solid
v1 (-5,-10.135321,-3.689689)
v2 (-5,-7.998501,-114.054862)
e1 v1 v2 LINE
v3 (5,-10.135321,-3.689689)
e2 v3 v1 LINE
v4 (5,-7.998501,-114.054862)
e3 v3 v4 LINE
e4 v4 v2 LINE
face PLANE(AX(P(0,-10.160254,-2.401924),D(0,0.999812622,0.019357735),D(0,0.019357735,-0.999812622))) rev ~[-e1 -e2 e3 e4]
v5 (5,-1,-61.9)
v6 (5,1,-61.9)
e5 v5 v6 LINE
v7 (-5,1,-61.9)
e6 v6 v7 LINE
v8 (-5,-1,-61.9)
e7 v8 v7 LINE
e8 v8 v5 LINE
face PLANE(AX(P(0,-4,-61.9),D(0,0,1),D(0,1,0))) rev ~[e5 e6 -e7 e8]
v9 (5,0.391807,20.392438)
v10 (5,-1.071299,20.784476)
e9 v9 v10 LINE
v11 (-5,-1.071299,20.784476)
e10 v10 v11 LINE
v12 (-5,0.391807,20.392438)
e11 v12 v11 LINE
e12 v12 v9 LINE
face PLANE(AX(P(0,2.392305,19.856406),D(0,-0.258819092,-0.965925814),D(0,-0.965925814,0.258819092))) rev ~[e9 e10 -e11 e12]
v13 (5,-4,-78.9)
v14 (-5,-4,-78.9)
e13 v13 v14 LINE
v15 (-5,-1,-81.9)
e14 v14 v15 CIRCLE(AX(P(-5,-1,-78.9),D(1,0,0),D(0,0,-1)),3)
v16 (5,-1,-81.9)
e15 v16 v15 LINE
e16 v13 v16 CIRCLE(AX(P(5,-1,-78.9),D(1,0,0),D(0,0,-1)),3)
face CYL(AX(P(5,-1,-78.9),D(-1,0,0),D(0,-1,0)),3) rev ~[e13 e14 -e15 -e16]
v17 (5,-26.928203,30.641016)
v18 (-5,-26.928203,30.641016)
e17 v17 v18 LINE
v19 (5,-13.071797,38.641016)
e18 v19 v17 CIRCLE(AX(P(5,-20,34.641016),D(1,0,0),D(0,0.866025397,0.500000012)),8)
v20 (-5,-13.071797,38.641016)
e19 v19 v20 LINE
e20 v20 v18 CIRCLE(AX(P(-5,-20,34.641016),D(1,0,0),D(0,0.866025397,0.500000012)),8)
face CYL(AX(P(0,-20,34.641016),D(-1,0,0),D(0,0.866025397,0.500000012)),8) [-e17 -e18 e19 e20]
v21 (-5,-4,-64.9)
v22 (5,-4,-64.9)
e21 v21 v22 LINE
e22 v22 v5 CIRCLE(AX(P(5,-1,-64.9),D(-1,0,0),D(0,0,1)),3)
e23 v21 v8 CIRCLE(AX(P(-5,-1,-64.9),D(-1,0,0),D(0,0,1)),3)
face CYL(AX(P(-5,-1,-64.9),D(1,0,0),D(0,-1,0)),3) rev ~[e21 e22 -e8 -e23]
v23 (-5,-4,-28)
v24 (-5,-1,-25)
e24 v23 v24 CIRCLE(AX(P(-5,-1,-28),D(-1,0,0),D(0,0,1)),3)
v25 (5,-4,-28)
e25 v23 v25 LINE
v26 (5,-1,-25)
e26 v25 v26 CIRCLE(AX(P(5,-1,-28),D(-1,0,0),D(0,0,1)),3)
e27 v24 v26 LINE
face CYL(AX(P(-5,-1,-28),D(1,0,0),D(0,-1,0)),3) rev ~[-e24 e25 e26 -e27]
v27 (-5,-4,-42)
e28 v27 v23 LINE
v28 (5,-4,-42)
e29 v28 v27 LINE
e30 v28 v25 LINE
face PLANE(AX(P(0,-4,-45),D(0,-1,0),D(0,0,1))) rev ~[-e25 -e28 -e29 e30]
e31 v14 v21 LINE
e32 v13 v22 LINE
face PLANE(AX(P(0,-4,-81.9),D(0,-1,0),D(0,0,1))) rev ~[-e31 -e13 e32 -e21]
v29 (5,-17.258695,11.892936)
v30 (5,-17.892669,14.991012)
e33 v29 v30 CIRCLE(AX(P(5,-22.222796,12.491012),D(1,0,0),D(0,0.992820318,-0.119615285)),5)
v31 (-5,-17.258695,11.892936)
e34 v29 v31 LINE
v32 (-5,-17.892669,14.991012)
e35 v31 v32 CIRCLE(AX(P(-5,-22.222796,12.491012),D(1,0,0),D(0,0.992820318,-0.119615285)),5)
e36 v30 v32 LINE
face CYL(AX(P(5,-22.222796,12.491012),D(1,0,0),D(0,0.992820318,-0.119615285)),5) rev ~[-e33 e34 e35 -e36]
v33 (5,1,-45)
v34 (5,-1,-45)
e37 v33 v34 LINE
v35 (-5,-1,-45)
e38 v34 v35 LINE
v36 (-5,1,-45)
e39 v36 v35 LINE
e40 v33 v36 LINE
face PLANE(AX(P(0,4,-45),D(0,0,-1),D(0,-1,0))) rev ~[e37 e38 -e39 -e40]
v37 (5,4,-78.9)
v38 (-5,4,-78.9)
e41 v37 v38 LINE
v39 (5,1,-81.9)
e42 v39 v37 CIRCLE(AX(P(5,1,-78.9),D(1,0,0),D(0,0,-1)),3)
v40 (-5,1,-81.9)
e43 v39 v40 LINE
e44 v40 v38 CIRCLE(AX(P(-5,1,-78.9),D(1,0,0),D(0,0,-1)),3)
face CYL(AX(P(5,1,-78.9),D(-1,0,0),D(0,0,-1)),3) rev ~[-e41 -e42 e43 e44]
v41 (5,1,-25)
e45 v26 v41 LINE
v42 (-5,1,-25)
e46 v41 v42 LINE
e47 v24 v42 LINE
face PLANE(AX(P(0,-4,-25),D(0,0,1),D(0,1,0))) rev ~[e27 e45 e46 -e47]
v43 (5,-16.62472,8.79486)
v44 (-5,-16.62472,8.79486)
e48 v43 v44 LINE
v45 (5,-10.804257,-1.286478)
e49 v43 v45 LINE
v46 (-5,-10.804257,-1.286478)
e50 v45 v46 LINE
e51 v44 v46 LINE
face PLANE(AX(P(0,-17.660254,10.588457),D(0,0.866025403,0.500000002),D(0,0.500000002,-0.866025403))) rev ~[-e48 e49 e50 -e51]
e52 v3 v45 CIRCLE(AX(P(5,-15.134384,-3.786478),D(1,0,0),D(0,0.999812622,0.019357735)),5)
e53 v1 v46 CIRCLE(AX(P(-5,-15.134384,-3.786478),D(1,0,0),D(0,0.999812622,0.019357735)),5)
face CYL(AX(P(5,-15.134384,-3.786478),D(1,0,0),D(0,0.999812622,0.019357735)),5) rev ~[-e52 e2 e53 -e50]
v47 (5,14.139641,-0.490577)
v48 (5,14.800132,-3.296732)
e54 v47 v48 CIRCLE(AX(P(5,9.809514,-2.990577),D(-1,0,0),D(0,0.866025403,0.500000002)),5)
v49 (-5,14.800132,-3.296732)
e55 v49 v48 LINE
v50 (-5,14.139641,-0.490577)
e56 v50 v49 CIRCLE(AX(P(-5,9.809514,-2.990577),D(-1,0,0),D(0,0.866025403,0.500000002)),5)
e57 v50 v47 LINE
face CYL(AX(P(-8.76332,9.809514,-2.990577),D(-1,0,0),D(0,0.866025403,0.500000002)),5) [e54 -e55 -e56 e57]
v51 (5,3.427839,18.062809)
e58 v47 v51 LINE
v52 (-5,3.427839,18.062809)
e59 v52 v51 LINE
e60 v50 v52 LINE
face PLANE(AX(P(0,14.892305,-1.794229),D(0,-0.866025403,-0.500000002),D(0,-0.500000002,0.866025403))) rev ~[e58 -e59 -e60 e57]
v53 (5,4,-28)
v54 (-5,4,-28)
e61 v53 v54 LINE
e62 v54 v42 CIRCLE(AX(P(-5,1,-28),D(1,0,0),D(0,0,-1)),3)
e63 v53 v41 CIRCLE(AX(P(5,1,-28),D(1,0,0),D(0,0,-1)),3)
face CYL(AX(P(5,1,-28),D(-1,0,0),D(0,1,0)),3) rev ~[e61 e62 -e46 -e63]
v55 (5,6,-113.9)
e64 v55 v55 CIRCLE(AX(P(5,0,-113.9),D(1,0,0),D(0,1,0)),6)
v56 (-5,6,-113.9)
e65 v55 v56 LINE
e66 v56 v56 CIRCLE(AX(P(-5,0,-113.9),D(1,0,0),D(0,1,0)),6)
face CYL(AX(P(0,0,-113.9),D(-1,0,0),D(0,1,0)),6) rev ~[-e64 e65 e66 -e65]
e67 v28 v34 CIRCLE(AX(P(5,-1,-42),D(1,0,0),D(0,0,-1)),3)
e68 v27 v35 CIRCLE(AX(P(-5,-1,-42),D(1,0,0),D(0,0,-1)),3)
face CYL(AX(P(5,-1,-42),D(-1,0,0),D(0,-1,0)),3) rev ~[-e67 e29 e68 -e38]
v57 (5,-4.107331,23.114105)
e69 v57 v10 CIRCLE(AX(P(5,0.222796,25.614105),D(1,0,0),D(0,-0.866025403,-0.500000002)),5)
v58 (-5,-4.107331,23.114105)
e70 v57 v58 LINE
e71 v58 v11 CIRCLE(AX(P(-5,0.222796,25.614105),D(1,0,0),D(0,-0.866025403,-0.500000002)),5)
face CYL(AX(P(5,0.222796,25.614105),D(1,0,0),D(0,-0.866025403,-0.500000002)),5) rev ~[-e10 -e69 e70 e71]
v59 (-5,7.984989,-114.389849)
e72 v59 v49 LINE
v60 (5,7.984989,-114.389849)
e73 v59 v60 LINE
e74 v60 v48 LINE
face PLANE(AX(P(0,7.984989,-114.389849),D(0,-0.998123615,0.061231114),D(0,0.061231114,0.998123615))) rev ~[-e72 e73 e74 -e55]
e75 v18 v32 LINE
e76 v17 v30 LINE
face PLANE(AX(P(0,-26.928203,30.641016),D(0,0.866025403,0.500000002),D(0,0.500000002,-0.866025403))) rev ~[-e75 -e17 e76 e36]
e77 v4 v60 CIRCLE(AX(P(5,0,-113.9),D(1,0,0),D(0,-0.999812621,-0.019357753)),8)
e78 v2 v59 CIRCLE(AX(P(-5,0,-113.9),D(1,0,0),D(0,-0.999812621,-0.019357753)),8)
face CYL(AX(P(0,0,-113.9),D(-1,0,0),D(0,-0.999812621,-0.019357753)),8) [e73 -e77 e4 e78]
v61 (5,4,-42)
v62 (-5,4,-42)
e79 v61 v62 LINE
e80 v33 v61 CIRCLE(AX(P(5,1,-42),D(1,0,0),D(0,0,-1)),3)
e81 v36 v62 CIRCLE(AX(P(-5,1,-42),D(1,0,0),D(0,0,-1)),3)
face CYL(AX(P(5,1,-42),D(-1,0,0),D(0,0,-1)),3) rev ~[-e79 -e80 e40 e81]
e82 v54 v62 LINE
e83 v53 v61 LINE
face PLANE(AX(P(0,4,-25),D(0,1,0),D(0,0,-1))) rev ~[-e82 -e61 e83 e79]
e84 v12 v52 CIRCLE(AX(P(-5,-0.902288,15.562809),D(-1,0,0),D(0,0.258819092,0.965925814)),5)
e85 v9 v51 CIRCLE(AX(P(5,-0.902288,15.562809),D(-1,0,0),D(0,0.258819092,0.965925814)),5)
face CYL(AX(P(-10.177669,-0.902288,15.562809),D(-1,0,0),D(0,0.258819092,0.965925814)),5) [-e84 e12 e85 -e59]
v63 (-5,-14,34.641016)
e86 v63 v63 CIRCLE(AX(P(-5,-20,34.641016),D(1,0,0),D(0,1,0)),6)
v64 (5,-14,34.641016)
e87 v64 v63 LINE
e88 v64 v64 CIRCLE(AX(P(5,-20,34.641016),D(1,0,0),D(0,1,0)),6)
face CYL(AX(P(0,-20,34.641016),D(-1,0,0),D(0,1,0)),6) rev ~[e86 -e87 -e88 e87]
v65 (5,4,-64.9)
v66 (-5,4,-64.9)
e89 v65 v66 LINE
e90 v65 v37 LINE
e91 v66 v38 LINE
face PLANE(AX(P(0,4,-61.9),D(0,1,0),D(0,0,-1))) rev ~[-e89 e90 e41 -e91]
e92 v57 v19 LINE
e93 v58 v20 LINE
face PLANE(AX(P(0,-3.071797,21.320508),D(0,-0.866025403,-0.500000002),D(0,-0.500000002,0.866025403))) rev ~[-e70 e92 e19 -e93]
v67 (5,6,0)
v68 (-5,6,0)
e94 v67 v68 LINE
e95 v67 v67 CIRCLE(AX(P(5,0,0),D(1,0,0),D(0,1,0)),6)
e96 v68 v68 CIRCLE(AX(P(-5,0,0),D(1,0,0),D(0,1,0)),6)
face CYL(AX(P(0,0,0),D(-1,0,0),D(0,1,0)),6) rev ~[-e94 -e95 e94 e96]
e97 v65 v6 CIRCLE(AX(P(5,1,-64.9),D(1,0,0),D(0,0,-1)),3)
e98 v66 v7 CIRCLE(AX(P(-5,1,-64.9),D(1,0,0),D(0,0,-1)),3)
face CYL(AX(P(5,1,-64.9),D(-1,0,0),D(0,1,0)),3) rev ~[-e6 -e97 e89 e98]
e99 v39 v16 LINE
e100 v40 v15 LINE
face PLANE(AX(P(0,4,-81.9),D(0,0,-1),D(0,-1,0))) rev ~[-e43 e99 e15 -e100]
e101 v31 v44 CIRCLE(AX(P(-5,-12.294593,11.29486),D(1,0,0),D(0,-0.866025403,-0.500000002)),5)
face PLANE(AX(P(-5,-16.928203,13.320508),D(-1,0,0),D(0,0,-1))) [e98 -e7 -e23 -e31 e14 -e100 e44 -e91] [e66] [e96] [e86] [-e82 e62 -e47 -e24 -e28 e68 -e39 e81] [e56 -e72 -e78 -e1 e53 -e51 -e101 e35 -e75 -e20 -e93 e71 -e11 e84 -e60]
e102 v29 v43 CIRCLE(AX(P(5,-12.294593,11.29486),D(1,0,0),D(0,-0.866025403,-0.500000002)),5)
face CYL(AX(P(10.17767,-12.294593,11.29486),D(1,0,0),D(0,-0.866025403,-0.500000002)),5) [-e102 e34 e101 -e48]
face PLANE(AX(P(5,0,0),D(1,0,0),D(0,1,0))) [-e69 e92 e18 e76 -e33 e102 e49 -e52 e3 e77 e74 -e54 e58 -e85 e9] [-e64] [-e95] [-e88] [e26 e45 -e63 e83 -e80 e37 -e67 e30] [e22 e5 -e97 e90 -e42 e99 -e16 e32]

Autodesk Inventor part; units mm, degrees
ref_plane "YZ Plane" through (0, 0, 0) normal (1, 0, 0) x (0, 1, 0)
ref_plane "XZ Plane" through (0, 0, 0) normal (0, 1, 0) x (-1, 0, 0)
ref_plane "XY Plane" through (0, 0, 0) normal (0, 0, 1) x (1, 0, 0)
sketch "草圖1" plane through (0, 0, 0) normal (1, 0, 0) x (0, 1, 0)
  line L0 (0, 0) -> (0, -113.9)
  line L1 (0, 0) -> (-20, 34.641016)
  circle A0 centre (0, 0) radius 6
  circle A1 centre (0, 0) radius 8
  circle A2 centre (-20, 34.641016) radius 6
  circle A3 centre (-20, 34.641016) radius 8
  circle A4 centre (0, -113.9) radius 6
  circle A5 centre (0, -113.9) radius 8
  line L2 (-13.071797, 38.641016) -> (-3.071797, 21.320508)
  line L3 (-3.071797, 21.320508) -> (2.392305, 19.856406)
  line L4 (2.392305, 19.856406) -> (14.892305, -1.794229)
  line L5 (14.892305, -1.794229) -> (7.984989, -114.389849)
  line L6 (-26.928203, 30.641016) -> (-16.928203, 13.320508)
  line L7 (-16.928203, 13.320508) -> (-17.660254, 10.588457)
  line L8 (-17.660254, 10.588457) -> (-10.160254, -2.401924)
  line L9 (-10.160254, -2.401924) -> (-7.998501, -114.054862)
  line L10 (4, -25) -> (-4, -25)
  line L11 (-4, -25) -> (-4, -45)
  line L12 (-4, -45) -> (4, -45)
  line L13 (4, -45) -> (4, -25)
  line L14 (4, -61.9) -> (-4, -61.9)
  line L15 (-4, -61.9) -> (-4, -81.9)
  line L16 (-4, -81.9) -> (4, -81.9)
  line L17 (4, -81.9) -> (4, -61.9)
  point P0 (0, -25)
  point P1 (0, -61.9)
  dimension "d0" = 113.9
  dimension "d1" = 40
  dimension "d2" = 150
  dimension "d3" = 12
  dimension "d4" = 16
  dimension "d5" = 12
  dimension "d6" = 16
  dimension "d7" = 12
  dimension "d8" = 16
  dimension "d9" = 25
  dimension "d10" = 15
  dimension "d11" = 135
  dimension "d12" = 135
  dimension "d13" = 20
  dimension "d14" = 20
  dimension "d15" = 10
  dimension "d16" = 12
  dimension "d21" = 20
  dimension "d22" = 8
  dimension "d23" = 25
  dimension "d25" = 32
sketch "草圖1 outline for 擠出1" plane through (0, 0, 0) normal (1, 0, 0) x (0, 1, 0)
  line L0 (7.984989, -114.389849) -> (14.892305, -1.794229)
  arc A0 (-7.998501, -114.054862) -> (7.984989, -114.389849) centre (0, -113.9) ccw
  line L1 (14.892305, -1.794229) -> (2.392305, 19.856406)
  line L2 (-10.160254, -2.401924) -> (-7.998501, -114.054862)
  line L3 (2.392305, 19.856406) -> (-3.071797, 21.320508)
  line L4 (-17.660254, 10.588457) -> (-10.160254, -2.401924)
  line L5 (-3.071797, 21.320508) -> (-13.071797, 38.641016)
  line L6 (-16.928203, 13.320508) -> (-17.660254, 10.588457)
  arc A1 (-13.071797, 38.641016) -> (-26.928203, 30.641016) centre (-20, 34.641016) ccw
  line L7 (-26.928203, 30.641016) -> (-16.928203, 13.320508)
  circle A2 centre (0, -113.9) radius 6
  line L8 (-4, -61.9) -> (4, -61.9)
  line L9 (-4, -81.9) -> (-4, -61.9)
  line L10 (4, -81.9) -> (-4, -81.9)
  line L11 (4, -61.9) -> (4, -81.9)
  circle A3 centre (-20, 34.641016) radius 6
  line L12 (-4, -25) -> (4, -25)
  line L13 (-4, -45) -> (-4, -25)
  line L14 (4, -45) -> (-4, -45)
  line L15 (4, -25) -> (4, -45)
  circle A4 centre (0, 0) radius 6
extrude "擠出1" add sketch "草圖1 outline for 擠出1" along normal mid plane 10
fillet "圓角2" radius 3 8 edges at (0, 4, -45) (0, 4, -25) (0, -4, -25) (0, -4, -45) (0, -4, -61.9) (0, 4, -61.9) (0, -4, -81.9) (0, 4, -81.9)
fillet "圓角3" radius 5 6 edges at (0, 14.8923, -1.7942) (0, 2.3923, 19.8564) (0, -3.0718, 21.3205) (0, -16.9282, 13.3205) (0, -17.6603, 10.5885) (0, -10.1603, -2.4019)
equation "\"d5\" = d3"
equation "\"d6\" = d4"
equation "\"d7\" = d3"
equation "\"d8\" = d4"
equation "\"d12\" = d11"
equation "\"d14\" = d13"
properties part number "Link_ECH" material "ABS 塑膠"
